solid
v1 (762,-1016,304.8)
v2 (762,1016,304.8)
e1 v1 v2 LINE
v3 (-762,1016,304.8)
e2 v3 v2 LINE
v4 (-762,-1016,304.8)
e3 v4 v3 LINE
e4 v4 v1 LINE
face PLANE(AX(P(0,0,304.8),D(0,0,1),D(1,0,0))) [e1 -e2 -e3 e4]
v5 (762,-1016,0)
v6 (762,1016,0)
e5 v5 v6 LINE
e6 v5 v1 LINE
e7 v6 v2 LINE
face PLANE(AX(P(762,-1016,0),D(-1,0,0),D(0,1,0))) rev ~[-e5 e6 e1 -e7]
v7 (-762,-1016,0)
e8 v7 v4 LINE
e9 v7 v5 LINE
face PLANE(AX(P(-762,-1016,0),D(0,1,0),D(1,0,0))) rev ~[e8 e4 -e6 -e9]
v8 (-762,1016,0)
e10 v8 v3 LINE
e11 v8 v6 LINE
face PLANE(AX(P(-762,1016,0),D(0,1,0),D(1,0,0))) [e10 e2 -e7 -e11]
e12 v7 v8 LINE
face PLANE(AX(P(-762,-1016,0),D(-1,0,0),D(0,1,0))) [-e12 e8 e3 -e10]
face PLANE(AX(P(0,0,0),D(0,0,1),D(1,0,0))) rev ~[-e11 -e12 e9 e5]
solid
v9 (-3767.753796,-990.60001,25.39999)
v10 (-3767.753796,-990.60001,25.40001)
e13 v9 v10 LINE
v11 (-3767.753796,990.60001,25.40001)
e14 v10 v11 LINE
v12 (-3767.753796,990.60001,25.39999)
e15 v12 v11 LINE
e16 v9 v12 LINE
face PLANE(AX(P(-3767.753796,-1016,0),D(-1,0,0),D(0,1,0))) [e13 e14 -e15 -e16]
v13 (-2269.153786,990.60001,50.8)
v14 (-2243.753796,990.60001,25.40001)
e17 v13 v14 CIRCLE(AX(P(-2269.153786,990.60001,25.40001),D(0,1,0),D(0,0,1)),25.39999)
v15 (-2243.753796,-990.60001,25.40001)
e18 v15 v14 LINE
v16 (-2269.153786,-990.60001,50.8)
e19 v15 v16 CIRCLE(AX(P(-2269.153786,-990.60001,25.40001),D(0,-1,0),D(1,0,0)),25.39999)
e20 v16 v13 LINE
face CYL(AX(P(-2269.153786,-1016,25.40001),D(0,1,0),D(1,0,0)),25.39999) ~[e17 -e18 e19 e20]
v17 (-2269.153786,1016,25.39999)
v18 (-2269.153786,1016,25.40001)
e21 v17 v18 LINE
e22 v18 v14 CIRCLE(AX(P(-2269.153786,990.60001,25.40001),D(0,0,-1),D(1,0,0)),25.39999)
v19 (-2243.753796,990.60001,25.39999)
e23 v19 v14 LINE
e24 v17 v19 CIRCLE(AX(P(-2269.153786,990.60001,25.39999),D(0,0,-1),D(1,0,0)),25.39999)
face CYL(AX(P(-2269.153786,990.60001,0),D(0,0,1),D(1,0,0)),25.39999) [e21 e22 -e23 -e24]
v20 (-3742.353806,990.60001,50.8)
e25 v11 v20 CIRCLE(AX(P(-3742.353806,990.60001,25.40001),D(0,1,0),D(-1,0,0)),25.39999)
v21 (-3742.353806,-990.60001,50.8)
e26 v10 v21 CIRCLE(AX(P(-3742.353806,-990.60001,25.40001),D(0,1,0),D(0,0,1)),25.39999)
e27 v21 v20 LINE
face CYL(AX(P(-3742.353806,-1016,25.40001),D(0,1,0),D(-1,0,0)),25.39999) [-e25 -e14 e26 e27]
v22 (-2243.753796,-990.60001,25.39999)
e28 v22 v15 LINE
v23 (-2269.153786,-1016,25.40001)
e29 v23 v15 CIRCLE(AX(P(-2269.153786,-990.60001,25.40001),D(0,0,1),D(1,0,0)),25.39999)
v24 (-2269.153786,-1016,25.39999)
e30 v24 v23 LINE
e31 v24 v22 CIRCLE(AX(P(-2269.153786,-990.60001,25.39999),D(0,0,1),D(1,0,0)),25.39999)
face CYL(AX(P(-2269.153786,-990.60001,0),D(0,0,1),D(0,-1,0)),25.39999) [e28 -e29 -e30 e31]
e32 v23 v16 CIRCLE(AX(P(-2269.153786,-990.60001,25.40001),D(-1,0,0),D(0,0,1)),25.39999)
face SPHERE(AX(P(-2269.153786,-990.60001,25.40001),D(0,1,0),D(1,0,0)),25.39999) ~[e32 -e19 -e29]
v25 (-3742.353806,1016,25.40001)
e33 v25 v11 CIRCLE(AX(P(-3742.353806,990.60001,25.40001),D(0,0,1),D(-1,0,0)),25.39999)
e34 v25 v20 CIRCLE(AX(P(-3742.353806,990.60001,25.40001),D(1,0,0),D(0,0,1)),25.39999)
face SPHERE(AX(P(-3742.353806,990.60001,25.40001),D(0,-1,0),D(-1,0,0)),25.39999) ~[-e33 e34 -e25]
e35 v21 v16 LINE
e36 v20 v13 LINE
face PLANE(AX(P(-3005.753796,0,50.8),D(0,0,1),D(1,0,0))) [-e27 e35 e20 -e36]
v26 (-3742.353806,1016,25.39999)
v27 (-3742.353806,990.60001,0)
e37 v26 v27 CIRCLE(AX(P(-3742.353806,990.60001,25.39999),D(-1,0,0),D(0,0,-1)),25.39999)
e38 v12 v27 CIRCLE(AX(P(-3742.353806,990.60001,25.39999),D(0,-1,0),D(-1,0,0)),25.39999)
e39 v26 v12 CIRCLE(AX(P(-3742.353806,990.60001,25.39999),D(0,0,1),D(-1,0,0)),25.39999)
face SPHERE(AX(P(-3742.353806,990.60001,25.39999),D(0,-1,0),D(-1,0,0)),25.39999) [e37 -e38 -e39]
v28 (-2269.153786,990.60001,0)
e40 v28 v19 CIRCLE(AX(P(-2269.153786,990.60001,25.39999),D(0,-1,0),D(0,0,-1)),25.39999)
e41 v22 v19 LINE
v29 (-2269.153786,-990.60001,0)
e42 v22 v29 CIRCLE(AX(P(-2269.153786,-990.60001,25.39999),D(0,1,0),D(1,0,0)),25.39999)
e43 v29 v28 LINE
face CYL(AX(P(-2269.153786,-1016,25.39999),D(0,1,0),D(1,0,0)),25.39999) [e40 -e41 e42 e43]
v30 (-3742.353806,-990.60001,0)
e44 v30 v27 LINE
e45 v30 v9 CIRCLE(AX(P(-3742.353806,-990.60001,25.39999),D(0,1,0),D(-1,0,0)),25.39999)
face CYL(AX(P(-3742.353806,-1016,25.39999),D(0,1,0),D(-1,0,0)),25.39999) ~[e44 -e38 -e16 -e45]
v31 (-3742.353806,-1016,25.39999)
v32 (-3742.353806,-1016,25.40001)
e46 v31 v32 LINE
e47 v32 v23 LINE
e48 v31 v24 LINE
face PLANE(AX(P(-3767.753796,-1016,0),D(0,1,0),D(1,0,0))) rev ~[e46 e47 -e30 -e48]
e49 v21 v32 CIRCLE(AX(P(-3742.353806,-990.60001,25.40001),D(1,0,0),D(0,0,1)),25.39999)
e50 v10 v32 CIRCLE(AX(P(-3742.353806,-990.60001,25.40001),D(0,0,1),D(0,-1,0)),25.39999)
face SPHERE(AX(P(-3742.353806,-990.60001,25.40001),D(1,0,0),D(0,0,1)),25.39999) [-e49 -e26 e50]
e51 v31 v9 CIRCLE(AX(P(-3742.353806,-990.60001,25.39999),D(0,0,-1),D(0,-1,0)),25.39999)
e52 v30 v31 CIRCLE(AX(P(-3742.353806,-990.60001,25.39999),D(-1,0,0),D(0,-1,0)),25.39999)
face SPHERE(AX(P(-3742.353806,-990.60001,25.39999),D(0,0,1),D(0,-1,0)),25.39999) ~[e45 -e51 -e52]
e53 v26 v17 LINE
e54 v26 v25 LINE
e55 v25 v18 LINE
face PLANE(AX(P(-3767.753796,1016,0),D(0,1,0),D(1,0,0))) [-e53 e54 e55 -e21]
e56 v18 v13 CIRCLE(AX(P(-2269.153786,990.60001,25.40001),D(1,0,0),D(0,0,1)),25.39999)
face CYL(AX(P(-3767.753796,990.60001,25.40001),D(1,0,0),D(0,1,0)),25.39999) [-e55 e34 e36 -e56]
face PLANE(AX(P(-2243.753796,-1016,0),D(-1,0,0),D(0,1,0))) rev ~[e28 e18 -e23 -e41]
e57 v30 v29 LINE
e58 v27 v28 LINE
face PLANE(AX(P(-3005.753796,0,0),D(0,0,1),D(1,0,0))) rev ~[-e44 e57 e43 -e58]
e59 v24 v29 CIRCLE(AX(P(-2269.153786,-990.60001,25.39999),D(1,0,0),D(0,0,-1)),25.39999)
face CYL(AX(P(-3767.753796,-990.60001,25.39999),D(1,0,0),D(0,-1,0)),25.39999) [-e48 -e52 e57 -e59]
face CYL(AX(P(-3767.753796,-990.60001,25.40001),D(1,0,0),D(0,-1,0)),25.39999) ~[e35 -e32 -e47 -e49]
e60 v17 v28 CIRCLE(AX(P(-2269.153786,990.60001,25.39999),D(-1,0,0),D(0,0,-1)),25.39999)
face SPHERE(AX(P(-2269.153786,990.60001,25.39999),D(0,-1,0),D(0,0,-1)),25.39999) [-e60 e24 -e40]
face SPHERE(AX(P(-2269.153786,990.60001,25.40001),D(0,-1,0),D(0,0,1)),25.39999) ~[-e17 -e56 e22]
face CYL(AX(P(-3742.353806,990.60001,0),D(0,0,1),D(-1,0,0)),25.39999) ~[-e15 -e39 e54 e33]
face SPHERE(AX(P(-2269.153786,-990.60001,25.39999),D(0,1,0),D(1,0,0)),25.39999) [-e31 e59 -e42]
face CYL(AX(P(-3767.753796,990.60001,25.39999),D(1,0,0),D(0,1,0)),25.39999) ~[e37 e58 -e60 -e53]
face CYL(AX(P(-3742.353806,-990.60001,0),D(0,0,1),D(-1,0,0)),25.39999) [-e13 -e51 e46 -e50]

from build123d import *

# Parameters (mm, degrees)
F0_W     = 1524
F0_H     = 2032
F1_DEPTH = 304.8
F2_W     = 1524
F2_H     = 2032
F3_DEPTH = 50.8
F4_R     = 25.39999


# Not quite as in the source:
# - a fillet or chamfer is up to 0.001 mm smaller than in the source, because OpenCascade refuses the exact size


with BuildPart() as f1:
    # F0 (on Top) → F1 (new body)
    with BuildSketch(Plane.XY):
        Rectangle(F0_W, F0_H)
    extrude(amount=F1_DEPTH)


with BuildPart() as f3:
    # F2 (on Top) → F3 (new body)
    with BuildSketch(Plane.XY):
        with Locations((-3005.7537959279, 0)):
            Rectangle(F2_W, F2_H)
    extrude(amount=F3_DEPTH)

    # F4 (radius 25.4 in the source; OpenCascade refuses exactly that, so slightly less here)
    f4_edges = [f3.edges().sort_by_distance(p)[0] for p in [
        (-2243.753796, 0, 50.8),
        (-2243.753796, 0, 0),
        (-2243.753796, -1016, 25.4),
        (-3005.753796, -1016, 50.8),
        (-3767.753796, 0, 50.8),
        (-3767.753796, -1016, 25.4),
        (-3005.753796, -1016, 0),
        (-3767.753796, 0, 0),
        (-3767.753796, 1016, 25.4),
        (-3005.753796, 1016, 0),
        (-3005.753796, 1016, 50.8),
        (-2243.753796, 1016, 25.4),
    ]]
    fillet(f4_edges, radius=F4_R)


solid = Compound([f1.part, f3.part])
